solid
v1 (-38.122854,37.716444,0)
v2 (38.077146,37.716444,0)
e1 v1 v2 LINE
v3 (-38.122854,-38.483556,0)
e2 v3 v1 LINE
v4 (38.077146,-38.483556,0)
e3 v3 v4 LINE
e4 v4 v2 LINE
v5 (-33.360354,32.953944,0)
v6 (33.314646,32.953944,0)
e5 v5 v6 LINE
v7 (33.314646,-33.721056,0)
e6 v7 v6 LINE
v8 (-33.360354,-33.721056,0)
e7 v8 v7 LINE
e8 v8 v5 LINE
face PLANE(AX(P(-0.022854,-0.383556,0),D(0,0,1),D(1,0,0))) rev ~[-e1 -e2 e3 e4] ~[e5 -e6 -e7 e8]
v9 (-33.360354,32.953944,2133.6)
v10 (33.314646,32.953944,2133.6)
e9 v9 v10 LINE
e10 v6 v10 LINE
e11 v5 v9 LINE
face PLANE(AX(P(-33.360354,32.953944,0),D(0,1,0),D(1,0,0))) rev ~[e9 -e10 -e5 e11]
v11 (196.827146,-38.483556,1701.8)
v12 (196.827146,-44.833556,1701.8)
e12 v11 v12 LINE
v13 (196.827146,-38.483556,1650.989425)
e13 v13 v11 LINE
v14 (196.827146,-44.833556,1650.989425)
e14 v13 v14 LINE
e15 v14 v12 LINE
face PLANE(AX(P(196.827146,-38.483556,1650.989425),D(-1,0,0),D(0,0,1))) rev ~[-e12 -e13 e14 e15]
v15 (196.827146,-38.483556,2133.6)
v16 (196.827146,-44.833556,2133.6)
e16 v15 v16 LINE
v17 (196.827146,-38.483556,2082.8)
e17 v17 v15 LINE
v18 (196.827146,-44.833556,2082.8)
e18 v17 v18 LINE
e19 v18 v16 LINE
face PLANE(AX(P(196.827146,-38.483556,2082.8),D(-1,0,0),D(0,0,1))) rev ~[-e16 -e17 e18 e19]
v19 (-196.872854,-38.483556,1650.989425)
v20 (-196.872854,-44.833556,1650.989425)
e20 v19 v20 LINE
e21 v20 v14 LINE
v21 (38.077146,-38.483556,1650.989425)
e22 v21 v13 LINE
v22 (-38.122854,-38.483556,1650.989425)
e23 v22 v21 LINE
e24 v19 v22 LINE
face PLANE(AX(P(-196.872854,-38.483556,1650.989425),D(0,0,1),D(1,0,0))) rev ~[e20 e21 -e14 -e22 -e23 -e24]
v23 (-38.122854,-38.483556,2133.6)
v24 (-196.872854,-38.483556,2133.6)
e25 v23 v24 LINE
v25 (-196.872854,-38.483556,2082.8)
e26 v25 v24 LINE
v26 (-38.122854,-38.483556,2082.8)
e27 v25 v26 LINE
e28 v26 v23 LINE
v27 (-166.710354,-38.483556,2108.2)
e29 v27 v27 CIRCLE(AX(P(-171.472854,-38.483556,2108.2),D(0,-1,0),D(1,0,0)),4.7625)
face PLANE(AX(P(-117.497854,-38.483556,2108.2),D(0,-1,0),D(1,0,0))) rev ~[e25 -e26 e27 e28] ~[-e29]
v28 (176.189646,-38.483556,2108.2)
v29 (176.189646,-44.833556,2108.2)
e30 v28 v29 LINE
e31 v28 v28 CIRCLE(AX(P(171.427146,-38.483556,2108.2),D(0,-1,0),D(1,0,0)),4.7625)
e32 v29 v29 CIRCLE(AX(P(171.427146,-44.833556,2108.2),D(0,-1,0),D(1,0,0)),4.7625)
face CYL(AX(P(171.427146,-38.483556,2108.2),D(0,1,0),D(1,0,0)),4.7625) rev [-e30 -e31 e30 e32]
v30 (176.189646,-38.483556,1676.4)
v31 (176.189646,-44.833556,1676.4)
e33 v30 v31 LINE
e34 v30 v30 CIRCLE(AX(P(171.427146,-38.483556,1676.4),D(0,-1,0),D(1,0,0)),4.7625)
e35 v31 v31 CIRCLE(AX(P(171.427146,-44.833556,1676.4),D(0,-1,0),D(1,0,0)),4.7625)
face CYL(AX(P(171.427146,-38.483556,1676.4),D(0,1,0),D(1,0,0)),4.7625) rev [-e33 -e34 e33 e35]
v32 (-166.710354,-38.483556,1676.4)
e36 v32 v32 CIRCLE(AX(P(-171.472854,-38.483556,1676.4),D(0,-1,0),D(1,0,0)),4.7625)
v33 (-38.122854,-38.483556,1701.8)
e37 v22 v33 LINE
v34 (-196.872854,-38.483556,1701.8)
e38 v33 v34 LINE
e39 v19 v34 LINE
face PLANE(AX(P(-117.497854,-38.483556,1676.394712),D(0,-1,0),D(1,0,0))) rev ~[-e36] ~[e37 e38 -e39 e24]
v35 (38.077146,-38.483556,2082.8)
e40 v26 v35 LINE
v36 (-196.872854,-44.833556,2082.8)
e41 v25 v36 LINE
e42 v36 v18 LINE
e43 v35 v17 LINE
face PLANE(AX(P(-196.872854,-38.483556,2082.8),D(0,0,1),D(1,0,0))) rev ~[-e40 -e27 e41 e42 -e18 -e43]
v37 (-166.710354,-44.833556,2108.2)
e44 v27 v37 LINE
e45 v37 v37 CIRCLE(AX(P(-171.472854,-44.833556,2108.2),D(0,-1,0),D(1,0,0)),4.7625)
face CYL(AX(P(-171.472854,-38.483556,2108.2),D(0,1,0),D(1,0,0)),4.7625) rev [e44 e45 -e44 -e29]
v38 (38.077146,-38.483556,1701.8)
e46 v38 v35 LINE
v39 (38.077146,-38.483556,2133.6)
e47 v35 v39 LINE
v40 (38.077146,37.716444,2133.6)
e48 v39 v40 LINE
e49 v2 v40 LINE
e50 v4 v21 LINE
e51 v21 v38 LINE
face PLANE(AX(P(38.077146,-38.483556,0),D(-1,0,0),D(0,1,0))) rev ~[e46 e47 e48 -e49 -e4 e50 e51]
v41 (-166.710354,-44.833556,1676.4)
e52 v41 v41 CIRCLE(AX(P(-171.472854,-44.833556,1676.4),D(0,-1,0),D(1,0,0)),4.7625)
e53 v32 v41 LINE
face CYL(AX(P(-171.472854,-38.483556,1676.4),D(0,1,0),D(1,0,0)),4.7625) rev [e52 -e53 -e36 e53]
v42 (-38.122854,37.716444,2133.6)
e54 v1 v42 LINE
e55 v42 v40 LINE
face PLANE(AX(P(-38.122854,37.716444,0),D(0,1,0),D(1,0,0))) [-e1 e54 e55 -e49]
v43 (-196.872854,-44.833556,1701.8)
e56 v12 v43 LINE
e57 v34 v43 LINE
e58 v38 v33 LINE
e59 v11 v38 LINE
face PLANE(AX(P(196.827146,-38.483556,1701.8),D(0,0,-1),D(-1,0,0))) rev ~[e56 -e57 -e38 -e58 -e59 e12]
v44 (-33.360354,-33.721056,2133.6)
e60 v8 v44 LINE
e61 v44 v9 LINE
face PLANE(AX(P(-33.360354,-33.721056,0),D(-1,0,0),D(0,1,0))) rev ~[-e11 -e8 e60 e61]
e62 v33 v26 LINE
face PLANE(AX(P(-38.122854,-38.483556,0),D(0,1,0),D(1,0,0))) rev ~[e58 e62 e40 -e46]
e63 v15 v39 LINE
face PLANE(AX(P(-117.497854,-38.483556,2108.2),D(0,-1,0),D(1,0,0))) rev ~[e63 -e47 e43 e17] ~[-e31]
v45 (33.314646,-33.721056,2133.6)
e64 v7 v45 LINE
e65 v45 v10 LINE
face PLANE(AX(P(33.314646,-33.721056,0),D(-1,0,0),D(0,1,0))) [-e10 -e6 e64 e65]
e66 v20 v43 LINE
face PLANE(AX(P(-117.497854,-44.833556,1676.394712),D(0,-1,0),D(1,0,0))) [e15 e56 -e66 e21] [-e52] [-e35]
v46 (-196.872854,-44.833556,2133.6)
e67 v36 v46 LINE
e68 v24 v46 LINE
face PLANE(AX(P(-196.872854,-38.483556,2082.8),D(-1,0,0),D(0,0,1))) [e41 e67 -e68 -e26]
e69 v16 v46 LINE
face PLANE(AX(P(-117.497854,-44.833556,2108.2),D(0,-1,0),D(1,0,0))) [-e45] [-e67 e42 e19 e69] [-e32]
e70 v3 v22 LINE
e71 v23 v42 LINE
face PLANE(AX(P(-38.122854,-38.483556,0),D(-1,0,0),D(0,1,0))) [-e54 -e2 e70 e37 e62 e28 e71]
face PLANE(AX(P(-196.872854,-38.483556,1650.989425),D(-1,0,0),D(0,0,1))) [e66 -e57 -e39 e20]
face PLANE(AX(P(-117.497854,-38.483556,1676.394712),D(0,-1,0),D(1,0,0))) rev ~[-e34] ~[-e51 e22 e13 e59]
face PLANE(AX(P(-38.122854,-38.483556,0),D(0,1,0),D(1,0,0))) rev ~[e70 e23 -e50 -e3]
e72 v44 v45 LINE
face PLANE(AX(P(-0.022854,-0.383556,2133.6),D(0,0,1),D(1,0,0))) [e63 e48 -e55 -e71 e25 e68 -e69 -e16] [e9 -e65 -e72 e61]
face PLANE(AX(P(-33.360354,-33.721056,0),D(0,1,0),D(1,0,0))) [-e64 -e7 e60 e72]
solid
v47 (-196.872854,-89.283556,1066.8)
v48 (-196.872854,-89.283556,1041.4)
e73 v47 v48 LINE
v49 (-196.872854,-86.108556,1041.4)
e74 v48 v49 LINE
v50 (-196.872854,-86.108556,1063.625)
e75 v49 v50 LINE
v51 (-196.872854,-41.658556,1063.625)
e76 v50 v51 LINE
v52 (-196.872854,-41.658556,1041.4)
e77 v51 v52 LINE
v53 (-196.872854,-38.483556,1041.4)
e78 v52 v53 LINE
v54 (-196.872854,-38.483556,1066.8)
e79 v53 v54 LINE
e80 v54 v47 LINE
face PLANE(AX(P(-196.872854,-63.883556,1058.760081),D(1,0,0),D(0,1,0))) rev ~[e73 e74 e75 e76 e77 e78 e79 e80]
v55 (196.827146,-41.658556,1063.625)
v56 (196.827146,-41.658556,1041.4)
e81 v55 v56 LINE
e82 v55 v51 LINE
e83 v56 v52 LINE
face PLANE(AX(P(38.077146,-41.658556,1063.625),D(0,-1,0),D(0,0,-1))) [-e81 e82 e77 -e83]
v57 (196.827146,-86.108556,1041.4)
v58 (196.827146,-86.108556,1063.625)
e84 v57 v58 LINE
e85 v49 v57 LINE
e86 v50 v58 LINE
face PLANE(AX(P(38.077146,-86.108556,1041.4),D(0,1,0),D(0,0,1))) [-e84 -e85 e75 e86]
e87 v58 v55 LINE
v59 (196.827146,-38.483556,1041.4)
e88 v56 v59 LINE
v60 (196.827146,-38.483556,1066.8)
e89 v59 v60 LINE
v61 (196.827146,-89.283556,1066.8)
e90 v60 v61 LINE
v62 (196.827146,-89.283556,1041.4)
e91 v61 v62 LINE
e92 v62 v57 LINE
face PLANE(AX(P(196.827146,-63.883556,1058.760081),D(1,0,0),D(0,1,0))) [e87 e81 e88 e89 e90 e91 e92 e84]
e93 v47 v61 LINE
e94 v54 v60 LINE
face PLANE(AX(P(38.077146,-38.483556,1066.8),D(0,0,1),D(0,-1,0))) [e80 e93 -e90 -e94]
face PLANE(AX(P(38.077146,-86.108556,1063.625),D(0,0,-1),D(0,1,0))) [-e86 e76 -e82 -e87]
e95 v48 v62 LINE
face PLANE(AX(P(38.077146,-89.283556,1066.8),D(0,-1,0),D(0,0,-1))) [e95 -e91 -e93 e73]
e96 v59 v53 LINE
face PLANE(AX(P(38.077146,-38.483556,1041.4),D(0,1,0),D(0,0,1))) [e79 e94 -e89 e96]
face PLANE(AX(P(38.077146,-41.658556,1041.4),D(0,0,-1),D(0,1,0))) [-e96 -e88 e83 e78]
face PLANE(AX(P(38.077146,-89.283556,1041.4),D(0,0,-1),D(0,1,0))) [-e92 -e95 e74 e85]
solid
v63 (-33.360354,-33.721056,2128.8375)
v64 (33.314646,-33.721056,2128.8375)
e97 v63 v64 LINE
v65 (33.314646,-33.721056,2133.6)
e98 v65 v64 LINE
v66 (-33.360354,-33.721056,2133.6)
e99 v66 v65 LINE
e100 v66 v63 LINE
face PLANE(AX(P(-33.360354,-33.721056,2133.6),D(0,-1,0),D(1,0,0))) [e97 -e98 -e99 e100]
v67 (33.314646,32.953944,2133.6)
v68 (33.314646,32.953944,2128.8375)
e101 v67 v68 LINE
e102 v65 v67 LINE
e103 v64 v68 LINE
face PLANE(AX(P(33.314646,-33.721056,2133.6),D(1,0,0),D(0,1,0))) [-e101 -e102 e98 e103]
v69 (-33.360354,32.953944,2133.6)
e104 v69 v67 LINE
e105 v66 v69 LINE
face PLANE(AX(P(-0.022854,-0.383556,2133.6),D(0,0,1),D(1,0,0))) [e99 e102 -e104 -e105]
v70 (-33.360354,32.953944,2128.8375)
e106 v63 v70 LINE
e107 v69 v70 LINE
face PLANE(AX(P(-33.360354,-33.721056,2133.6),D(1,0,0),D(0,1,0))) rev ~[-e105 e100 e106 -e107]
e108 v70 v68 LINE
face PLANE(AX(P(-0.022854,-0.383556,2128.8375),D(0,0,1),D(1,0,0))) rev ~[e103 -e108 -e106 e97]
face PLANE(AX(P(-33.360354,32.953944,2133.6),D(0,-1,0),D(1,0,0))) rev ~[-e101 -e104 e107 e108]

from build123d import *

# Parameters (mm, degrees)
F0_W          = 76.2
F0_H          = 76.2
F0_W_2        = 66.675
F0_H_2        = 66.675
F1_DEPTH      = 2133.6
F2_W          = 66.675
F2_H          = 66.675
F4_DEPTH      = 4.7625
F5_W          = 158.75
F5_H          = 50.8105754852
F5_R          = 4.7625
F5_W_2        = 76.2
F5_H_2        = 50.8
F6_DEPTH      = 6.35
F8_DEPTH      = 158.75
F8_DEPTH_BACK = 234.95


# Not quite as in the source:
# - a feature names something its author has since deleted; it is built from what else it names


with BuildPart() as f1:
    # F0 (on Top) → F1 (new body)
    with BuildSketch(Plane.XY):
        with Locations((-0.0228539575, -0.3835560492)):
            Rectangle(F0_W, F0_H)
        with Locations((-0.0228539575, -0.3835560492)):
            Rectangle(F0_W_2, F0_H_2, mode=Mode.SUBTRACT)
    extrude(amount=F1_DEPTH)

    # F5 (on face) → F6 (join)
    with BuildSketch(Plane.XZ.offset(38.4835560492)):
        with Locations((-117.4978539575, 1676.3947122574)):
            Rectangle(F5_W, F5_H)
        with Locations((-171.4728539575, 1676.4)):
            Circle(F5_R, mode=Mode.SUBTRACT)
        with Locations((117.4521460425, 1676.3947122574)):
            Rectangle(F5_W, F5_H)
        with Locations((171.4271460425, 1676.4)):
            Circle(F5_R, mode=Mode.SUBTRACT)
        with Locations((-0.0228539575, 1676.3947122574)):
            Rectangle(F5_W_2, F5_H)
        with Locations((-117.4978539575, 2108.2)):
            Rectangle(F5_W, F5_H_2)
        with Locations((-171.4728539575, 2108.2)):
            Circle(F5_R, mode=Mode.SUBTRACT)
        with Locations((-0.0228539575, 2108.2)):
            Rectangle(F5_W_2, F5_H_2)
        with Locations((117.4521460425, 2108.2)):
            Rectangle(F5_W, F5_H_2)
        with Locations((171.4271460425, 2108.2)):
            Circle(F5_R, mode=Mode.SUBTRACT)
    extrude(amount=F6_DEPTH)


with BuildPart() as f4:
    # F2 (on face) → F4 (new body)
    with BuildSketch(Plane.XY.offset(2133.6)):
        with Locations((-0.0228539575, -0.3835560492)):
            Rectangle(F2_W, F2_H)
    extrude(amount=-F4_DEPTH)


with BuildPart() as f8:
    # F7 (on face) → F8 (new body, two sides)
    with BuildSketch(Plane.YZ.offset(38.0771460425)) as f8_sk:
        Polygon((-38.4835560492, 1041.4), (-38.4835560492, 1066.8), (-89.2835560492, 1066.8), (-89.2835560492, 1041.4), (-86.1085560492, 1041.4), (-86.1085560492, 1063.625), (-41.6585560492, 1063.625), (-41.6585560492, 1041.4), align=None)
    extrude(amount=F8_DEPTH)
    extrude(f8_sk.sketch, amount=-F8_DEPTH_BACK)


solid = Compound([f1.part, f4.part, f8.part])
